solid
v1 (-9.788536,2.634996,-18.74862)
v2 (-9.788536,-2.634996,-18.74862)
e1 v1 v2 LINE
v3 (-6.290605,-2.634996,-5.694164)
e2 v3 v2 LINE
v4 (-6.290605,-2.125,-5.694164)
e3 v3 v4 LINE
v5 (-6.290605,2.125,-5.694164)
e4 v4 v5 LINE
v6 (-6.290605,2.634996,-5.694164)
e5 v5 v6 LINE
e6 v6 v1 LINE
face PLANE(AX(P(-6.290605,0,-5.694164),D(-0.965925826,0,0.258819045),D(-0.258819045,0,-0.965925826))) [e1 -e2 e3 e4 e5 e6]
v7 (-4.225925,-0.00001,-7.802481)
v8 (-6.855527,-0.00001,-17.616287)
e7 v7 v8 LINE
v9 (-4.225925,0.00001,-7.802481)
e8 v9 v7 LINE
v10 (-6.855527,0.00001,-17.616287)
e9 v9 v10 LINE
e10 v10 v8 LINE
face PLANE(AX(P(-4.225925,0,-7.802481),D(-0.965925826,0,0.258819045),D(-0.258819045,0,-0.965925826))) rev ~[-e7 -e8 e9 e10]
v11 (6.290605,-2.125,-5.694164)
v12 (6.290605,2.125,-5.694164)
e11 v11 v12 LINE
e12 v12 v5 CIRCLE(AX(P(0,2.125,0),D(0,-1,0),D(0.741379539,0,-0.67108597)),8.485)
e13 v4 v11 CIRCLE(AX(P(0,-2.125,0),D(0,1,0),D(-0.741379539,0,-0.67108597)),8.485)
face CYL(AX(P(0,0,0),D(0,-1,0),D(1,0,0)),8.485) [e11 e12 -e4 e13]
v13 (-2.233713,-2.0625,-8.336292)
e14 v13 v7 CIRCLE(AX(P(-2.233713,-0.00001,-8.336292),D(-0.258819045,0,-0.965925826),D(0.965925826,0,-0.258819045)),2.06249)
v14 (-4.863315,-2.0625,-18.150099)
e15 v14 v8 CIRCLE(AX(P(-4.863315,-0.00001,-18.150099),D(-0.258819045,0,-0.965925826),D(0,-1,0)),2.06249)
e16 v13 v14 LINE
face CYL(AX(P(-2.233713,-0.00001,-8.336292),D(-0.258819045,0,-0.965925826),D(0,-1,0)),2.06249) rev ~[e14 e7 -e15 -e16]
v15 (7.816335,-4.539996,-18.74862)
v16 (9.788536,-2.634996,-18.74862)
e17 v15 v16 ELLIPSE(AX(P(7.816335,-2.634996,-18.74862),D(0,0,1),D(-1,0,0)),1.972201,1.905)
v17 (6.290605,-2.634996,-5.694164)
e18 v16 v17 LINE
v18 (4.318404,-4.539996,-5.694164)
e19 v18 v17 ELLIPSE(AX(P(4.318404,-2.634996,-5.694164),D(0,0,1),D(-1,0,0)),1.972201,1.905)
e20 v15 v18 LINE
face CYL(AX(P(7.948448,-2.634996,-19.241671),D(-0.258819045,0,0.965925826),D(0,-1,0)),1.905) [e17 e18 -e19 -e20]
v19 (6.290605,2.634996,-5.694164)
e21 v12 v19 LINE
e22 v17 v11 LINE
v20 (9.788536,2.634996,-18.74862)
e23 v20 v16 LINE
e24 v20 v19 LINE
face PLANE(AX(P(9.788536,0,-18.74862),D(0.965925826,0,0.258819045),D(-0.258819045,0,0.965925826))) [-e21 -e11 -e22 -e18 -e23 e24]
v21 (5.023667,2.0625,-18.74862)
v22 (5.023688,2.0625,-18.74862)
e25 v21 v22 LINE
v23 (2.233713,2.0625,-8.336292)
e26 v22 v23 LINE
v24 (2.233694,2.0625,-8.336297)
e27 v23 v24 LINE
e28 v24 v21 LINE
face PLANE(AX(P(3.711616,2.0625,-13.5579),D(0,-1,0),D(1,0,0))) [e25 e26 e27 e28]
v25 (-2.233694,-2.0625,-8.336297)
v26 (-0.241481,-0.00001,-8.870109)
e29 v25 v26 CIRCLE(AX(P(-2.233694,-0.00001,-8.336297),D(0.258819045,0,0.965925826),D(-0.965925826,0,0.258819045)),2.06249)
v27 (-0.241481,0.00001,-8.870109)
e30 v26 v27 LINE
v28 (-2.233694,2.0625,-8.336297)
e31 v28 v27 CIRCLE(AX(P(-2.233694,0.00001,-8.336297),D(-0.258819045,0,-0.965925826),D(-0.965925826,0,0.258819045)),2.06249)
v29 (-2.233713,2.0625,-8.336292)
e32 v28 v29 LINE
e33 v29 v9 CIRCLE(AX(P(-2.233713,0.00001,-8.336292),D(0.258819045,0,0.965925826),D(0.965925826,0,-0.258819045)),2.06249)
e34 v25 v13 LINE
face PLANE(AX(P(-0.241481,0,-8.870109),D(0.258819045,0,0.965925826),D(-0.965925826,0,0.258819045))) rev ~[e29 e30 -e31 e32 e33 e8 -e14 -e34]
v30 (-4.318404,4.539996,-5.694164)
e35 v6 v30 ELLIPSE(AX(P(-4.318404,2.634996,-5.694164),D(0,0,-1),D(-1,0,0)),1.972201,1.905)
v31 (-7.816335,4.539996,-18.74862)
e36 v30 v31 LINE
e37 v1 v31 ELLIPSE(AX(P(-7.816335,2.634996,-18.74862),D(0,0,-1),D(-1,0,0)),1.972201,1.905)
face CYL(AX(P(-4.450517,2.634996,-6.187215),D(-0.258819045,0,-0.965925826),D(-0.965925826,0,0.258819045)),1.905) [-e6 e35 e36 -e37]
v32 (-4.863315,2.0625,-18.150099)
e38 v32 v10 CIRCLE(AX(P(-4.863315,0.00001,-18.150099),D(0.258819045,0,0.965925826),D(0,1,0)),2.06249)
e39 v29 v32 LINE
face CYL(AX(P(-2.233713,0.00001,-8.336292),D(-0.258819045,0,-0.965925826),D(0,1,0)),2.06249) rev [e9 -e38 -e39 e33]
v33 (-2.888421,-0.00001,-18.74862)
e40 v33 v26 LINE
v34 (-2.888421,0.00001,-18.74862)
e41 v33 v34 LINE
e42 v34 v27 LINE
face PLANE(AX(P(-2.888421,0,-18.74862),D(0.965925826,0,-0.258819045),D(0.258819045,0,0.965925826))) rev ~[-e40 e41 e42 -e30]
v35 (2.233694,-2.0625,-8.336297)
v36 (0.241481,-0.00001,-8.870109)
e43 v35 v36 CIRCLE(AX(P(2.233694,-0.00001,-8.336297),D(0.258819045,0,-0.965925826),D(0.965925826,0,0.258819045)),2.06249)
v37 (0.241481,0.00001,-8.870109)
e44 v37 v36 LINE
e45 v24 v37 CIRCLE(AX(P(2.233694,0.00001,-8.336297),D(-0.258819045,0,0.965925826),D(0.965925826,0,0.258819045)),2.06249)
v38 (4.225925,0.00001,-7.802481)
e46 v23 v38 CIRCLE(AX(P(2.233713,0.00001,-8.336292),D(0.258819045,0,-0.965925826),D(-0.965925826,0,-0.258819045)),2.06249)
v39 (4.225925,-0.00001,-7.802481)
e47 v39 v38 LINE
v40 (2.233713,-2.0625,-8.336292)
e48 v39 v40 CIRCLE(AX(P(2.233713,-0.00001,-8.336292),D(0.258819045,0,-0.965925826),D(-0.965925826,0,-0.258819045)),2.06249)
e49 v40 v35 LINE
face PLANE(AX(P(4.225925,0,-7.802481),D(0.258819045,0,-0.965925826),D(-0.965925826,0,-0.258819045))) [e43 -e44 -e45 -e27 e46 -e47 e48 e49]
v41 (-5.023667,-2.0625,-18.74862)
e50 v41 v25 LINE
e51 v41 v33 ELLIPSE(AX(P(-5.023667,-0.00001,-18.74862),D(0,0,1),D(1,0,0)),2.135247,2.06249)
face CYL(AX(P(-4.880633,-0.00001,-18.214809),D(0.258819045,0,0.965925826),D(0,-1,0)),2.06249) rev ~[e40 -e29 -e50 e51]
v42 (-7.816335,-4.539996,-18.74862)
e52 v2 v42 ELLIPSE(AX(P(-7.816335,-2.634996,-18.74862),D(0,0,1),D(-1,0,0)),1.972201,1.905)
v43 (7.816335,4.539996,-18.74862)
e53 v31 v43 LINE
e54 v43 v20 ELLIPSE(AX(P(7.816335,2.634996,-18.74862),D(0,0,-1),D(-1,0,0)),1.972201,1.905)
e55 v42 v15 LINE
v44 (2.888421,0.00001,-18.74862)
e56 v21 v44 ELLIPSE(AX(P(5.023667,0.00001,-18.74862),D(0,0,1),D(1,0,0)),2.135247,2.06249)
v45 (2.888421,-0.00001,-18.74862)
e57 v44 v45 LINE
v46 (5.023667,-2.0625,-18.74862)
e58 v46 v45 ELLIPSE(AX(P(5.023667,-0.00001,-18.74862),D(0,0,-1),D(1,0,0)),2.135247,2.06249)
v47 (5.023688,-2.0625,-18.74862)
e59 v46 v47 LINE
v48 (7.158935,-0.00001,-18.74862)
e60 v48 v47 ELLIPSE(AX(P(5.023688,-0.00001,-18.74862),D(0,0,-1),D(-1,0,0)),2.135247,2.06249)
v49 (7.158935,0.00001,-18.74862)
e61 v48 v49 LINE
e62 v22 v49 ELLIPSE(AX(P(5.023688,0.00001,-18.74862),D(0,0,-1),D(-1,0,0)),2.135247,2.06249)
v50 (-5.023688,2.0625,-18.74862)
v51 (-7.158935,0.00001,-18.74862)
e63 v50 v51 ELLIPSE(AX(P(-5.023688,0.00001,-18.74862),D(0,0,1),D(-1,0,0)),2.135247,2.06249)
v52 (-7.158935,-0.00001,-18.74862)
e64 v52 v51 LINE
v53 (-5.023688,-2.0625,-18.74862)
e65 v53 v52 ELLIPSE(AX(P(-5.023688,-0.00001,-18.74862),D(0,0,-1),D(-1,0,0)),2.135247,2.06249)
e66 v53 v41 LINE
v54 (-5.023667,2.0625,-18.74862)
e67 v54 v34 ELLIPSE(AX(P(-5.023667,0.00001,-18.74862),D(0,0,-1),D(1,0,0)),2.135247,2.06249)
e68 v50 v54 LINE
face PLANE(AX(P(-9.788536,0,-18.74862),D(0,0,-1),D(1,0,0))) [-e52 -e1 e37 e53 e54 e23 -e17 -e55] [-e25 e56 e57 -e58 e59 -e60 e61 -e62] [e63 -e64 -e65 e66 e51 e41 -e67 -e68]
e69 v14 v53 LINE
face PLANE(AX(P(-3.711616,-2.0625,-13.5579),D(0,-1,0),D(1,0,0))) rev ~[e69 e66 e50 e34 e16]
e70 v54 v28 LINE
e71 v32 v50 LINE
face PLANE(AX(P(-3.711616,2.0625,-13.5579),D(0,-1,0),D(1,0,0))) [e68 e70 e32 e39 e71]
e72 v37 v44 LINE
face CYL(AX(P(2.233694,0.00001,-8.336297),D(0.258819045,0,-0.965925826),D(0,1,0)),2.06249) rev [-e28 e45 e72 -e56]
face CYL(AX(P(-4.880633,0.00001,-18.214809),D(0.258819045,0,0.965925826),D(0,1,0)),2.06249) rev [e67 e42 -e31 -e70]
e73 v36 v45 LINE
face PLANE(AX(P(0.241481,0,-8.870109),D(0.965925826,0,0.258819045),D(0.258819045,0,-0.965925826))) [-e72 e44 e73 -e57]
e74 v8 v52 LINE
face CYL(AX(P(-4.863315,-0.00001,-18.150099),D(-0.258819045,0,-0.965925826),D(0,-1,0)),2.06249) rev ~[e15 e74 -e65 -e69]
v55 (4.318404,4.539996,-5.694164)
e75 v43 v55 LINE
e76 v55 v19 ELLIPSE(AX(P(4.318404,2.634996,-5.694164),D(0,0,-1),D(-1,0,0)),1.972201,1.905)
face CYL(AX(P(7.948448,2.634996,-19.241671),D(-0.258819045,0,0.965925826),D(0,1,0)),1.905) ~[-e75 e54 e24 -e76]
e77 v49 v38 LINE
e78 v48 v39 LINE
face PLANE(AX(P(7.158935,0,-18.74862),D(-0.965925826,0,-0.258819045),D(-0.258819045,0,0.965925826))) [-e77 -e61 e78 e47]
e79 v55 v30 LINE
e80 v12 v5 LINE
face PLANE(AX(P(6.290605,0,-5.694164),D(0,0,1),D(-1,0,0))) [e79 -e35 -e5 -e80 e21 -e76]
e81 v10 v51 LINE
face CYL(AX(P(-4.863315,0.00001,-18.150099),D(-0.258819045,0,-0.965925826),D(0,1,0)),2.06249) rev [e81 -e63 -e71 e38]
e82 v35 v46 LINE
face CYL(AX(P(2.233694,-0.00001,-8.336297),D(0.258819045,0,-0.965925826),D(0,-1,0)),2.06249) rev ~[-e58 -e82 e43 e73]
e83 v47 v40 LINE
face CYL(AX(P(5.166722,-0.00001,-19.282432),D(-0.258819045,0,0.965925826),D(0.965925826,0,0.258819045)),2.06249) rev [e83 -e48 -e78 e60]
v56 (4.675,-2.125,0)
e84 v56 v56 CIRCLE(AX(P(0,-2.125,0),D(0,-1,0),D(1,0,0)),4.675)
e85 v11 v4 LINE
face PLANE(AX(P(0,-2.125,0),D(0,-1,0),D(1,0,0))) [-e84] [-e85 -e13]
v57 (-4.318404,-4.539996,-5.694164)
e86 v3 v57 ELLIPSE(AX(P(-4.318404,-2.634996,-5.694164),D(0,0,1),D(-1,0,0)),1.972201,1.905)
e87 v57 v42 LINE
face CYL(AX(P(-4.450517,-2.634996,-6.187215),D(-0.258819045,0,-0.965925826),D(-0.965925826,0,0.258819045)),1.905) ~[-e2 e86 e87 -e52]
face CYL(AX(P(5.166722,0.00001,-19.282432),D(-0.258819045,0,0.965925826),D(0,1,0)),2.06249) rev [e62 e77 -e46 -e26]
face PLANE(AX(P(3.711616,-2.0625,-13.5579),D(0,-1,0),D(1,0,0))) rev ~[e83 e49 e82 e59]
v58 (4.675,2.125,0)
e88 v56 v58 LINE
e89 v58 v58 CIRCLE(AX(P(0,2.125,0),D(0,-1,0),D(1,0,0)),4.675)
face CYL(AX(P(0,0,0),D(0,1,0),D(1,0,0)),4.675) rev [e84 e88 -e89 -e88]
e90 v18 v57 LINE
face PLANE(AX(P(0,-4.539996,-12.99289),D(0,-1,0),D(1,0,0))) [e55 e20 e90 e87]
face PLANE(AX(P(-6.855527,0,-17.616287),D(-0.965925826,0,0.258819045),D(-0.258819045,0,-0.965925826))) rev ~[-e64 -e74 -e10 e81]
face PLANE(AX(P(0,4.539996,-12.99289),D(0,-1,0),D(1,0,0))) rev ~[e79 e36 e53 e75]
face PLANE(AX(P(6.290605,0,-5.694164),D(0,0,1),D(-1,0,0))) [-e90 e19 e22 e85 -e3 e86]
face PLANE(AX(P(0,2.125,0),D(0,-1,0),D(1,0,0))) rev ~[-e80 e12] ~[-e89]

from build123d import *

# Parameters (mm, degrees)
F0_R     = 8.485
F0_R_2   = 4.675
F1_DEPTH = 2.125
F3_DEPTH = 4.539996
F5_DEPTH = 2.0625
F6_R     = 2.06249
F7_R     = 1.905


# Not quite as in the source:
# - a fillet or chamfer is up to 0.001 mm smaller than in the source, because OpenCascade refuses the exact size


with BuildPart() as f1:
    # F0 (on Front) → F1 (new body, symmetric)
    with BuildSketch(Plane.XZ):
        Circle(F0_R)
        Circle(F0_R_2, mode=Mode.SUBTRACT)
    extrude(amount=F1_DEPTH, both=True)

    # F2 (on Front) → F3 (join, symmetric)
    with BuildSketch(Plane.XZ):
        Polygon((-6.2906053879, -5.6941644561), (-9.7885362858, -18.7486202883), (9.7885362858, -18.7486202883), (6.2906053879, -5.6941644561), align=None)
    extrude(amount=F3_DEPTH, both=True)

    # F4 (on Front) → F5 (cut, symmetric)
    with BuildSketch(Plane.XZ):
        Polygon((4.22592549, -7.8024805709), (0.2414814566, -8.8701091319), (2.8884205433, -18.7486202883), (7.1589347875, -18.7486202883), align=None)
        Polygon((-0.2414814566, -8.8701091319), (-4.22592549, -7.8024805709), (-6.8555269883, -17.6162869659), (-7.1589347875, -18.7486202883), (-2.8884205433, -18.7486202883), align=None)
    extrude(amount=F5_DEPTH, both=True, mode=Mode.SUBTRACT)

    # F6 (radius 2.0625 in the source; OpenCascade refuses exactly that, so slightly less here)
    f6_edges = [f1.edges().sort_by_distance(p)[0] for p in [
        (-5.69243, -2.0625, -13.27555),
        (1.564951, -2.0625, -13.809365),
        (5.69243, -2.0625, -13.27555),
        (-1.564951, -2.0625, -13.809365),
        (5.69243, 2.0625, -13.27555),
        (-1.564951, 2.0625, -13.809365),
        (-5.69243, 2.0625, -13.27555),
        (1.564951, 2.0625, -13.809365),
    ]]
    fillet(f6_edges, radius=F6_R)

    # F7
    f7_edges = [f1.edges().sort_by_distance(p)[0] for p in [
        (8.039571, 4.539996, -12.221392),
        (8.039571, -4.539996, -12.221392),
        (-8.039571, 4.539996, -12.221392),
        (-8.039571, -4.539996, -12.221392),
    ]]
    fillet(f7_edges, radius=F7_R)


solid = f1.part
